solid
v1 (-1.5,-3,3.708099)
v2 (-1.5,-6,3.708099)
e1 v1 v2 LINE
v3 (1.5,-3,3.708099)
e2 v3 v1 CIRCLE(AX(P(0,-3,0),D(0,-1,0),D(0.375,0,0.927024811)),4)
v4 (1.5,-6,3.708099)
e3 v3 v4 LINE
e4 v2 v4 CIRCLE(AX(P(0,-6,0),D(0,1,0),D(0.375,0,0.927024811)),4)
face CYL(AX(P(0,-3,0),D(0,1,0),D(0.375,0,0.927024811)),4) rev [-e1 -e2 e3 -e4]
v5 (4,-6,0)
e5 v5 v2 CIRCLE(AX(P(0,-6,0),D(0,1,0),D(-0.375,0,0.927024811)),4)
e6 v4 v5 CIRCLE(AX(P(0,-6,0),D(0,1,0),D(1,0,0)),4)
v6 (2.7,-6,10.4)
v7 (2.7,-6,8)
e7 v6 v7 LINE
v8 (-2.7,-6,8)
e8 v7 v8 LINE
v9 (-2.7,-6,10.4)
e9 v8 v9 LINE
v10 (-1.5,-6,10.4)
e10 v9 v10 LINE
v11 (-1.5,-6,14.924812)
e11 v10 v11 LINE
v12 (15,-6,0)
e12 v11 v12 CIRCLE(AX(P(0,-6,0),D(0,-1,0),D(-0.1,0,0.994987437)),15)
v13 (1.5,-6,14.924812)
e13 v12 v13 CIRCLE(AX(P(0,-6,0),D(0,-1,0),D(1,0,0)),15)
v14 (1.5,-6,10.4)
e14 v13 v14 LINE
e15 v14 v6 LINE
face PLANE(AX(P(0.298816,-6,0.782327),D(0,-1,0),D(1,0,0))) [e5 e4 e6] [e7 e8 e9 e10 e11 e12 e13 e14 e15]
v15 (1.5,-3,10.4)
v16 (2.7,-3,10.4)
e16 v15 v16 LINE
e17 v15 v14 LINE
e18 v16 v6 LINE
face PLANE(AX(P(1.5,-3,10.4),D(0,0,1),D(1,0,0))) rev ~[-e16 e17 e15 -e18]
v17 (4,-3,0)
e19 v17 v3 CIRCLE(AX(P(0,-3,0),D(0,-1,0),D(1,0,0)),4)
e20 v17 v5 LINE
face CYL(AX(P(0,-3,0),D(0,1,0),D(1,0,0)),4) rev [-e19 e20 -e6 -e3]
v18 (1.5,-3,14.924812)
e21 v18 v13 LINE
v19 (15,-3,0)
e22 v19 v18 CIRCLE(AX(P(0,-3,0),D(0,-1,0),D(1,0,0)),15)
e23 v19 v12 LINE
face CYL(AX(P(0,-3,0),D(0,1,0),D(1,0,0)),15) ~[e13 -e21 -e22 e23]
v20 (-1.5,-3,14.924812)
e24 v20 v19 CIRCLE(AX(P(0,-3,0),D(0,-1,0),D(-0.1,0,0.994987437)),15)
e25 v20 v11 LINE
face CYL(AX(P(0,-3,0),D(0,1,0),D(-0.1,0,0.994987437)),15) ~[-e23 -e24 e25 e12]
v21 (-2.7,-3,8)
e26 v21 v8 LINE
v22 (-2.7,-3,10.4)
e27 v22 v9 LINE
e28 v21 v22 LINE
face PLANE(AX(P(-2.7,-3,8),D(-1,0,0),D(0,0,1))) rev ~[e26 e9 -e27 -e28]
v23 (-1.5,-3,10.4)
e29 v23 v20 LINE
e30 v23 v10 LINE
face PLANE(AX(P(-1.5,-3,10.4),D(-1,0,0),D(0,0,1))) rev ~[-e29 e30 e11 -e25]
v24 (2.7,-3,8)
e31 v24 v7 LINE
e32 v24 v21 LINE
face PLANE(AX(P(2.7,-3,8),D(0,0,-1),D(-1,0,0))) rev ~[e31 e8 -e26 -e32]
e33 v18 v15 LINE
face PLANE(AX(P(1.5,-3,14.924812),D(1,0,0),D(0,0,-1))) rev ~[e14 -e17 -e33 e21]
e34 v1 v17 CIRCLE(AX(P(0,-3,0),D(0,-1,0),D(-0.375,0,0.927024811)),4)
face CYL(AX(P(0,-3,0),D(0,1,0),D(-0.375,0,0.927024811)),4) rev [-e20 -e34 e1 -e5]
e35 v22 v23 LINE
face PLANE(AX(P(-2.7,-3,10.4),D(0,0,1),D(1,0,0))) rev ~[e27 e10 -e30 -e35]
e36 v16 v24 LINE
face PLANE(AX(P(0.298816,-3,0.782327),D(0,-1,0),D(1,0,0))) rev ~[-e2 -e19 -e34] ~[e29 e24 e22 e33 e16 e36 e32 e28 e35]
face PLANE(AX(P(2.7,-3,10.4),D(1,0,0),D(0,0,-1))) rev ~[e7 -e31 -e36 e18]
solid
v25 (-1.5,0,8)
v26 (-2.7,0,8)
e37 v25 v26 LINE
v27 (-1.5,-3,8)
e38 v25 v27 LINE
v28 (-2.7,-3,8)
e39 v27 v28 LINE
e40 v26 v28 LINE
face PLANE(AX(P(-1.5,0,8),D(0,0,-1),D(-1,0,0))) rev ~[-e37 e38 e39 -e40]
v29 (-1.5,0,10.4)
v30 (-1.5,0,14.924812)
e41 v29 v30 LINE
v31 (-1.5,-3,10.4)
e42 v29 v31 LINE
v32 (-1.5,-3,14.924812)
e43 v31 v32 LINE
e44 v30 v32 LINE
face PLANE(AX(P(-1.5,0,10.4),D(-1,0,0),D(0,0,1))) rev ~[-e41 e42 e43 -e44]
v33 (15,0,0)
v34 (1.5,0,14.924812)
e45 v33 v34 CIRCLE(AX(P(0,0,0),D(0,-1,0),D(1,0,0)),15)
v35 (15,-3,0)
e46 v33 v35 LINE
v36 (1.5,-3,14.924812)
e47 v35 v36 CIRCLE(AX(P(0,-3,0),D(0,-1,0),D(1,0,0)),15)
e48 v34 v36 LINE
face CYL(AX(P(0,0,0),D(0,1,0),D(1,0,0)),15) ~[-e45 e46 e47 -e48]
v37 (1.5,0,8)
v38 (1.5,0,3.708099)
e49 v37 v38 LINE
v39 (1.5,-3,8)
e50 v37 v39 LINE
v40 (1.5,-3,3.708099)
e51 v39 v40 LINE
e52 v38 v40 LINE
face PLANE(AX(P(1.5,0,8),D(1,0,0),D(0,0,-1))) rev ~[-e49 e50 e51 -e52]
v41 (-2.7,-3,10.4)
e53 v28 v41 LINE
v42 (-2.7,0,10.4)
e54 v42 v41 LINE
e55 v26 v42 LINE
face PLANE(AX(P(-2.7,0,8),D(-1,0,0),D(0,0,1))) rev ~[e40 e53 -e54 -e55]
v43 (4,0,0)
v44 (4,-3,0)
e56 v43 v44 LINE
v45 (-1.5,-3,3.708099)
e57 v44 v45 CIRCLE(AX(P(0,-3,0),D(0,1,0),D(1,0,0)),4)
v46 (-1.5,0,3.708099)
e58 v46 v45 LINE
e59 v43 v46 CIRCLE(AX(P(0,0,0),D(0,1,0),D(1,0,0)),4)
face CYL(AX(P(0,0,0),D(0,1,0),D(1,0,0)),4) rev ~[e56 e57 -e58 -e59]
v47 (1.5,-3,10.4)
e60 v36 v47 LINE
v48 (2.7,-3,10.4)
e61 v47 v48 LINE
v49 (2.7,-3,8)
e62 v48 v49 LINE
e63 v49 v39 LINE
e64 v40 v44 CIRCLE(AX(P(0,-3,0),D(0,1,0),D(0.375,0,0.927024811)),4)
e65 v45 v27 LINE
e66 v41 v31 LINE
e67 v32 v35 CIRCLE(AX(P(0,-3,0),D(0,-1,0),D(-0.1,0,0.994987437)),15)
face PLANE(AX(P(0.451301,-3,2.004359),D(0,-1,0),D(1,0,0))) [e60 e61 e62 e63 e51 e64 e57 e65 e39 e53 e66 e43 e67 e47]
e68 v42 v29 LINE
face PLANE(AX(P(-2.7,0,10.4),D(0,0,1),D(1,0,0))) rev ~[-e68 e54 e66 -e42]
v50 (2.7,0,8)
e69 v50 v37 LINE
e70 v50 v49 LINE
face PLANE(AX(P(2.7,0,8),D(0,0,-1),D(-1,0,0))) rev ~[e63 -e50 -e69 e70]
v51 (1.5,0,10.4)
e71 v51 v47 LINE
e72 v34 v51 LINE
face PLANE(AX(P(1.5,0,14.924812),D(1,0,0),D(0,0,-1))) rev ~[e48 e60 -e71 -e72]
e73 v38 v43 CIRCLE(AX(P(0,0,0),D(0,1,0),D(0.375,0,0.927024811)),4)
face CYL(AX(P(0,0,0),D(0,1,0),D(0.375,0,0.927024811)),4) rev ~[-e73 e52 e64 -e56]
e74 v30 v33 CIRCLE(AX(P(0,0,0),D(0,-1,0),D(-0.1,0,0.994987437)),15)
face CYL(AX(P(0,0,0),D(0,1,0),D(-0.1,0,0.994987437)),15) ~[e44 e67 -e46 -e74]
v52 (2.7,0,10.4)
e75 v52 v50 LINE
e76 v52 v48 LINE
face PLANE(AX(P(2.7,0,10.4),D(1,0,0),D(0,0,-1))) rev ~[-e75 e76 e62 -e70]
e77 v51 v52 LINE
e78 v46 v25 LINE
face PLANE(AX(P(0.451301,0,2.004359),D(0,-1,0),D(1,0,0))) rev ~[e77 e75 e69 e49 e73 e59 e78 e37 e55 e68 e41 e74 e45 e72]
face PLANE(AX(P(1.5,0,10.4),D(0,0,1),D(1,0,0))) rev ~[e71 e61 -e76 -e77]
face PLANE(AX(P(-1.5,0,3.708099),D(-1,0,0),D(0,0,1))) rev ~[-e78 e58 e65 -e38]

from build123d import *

# Parameters (mm, degrees)
F1_DEPTH = 3
F3_DEPTH = 3
F4_DEPTH = 25


with BuildPart() as f1:
    # F0 (on Front) → F1 (new body)
    with BuildSketch(Plane.XZ):
        with BuildLine():
            ThreePointArc((-1.5, 14.9248115566), (-10.0623058987, -11.1242977306), (15, 0))
            ThreePointArc((15, 0), (11.1242977306, 10.0623058987), (1.5, 14.9248115566))
            Line((1.5, 14.9248115566), (1.5, 10.4))
            Line((1.5, 10.4), (2.7, 10.4))
            Line((2.7, 10.4), (2.7, 8))
            Line((2.7, 8), (1.5, 8))
            Line((1.5, 8), (1.5, 3.7080992435))
            ThreePointArc((1.5, 3.7080992435), (3.3166247904, 2.2360679775), (4, 0))
            ThreePointArc((4, 0), (-2.2360679775, -3.3166247904), (-1.5, 3.7080992435))
            Line((-1.5, 3.7080992435), (-1.5, 8))
            Line((-1.5, 8), (-2.7, 8))
            Line((-2.7, 8), (-2.7, 10.4))
            Line((-2.7, 10.4), (-1.5, 10.4))
            Line((-1.5, 10.4), (-1.5, 14.9248115566))
        make_face()
    extrude(amount=F1_DEPTH)


with BuildPart() as f3:
    # F2 (on face) → F3 (new body)
    with BuildSketch(Plane.XZ.offset(3)):
        with BuildLine():
            ThreePointArc((-2.7, 9.6286032217), (-6.0415229868, -7.9686887253), (10, 0))
            ThreePointArc((10, 0), (7.9686887253, 6.0415229868), (2.7, 9.6286032217))
            Line((2.7, 9.6286032217), (2.7, 8))
            Line((2.7, 8), (1.5, 8))
            Line((1.5, 8), (1.5, 3.7080992435))
            ThreePointArc((1.5, 3.7080992435), (3.3166247904, 2.2360679775), (4, 0))
            ThreePointArc((4, 0), (-2.2360679775, -3.3166247904), (-1.5, 3.7080992435))
            Line((-1.5, 3.7080992435), (-1.5, 8))
            Line((-1.5, 8), (-2.7, 8))
            Line((-2.7, 8), (-2.7, 9.6286032217))
        make_face()
        with BuildLine():
            ThreePointArc((2.7, 9.6286032217), (7.9686887253, 6.0415229868), (10, 0))
            ThreePointArc((10, 0), (-6.0415229868, -7.9686887253), (-2.7, 9.6286032217))
            Line((-2.7, 9.6286032217), (-2.7, 10.4))
            Line((-2.7, 10.4), (-1.5, 10.4))
            Line((-1.5, 10.4), (-1.5, 14.9248115566))
            ThreePointArc((-1.5, 14.9248115566), (-10.0623058987, -11.1242977306), (15, 0))
            ThreePointArc((15, 0), (11.1242977306, 10.0623058987), (1.5, 14.9248115566))
            Line((1.5, 14.9248115566), (1.5, 10.4))
            Line((1.5, 10.4), (2.7, 10.4))
            Line((2.7, 10.4), (2.7, 9.6286032217))
        make_face()
        with BuildLine():
            Line((1.5, 3.7080992435), (1.5, 8))
            Line((1.5, 8), (-1.5, 8))
            Line((-1.5, 8), (-1.5, 3.7080992435))
            ThreePointArc((-1.5, 3.7080992435), (0, 4), (1.5, 3.7080992435))
        make_face()
        with BuildLine():
            ThreePointArc((4, 0), (3.3166247904, 2.2360679775), (1.5, 3.7080992435))
            ThreePointArc((1.5, 3.7080992435), (0, 4), (-1.5, 3.7080992435))
            ThreePointArc((-1.5, 3.7080992435), (-2.2360679775, -3.3166247904), (4, 0))
        make_face()
    extrude(amount=F3_DEPTH)

    # F2 (on face) → F4 (cut)
    with BuildSketch(Plane.XZ.offset(3)):
        with BuildLine():
            ThreePointArc((4, 0), (3.3166247904, 2.2360679775), (1.5, 3.7080992435))
            ThreePointArc((1.5, 3.7080992435), (0, 4), (-1.5, 3.7080992435))
            ThreePointArc((-1.5, 3.7080992435), (-2.2360679775, -3.3166247904), (4, 0))
        make_face()
    extrude(amount=F4_DEPTH, mode=Mode.SUBTRACT)


solid = Compound([f1.part, f3.part])
